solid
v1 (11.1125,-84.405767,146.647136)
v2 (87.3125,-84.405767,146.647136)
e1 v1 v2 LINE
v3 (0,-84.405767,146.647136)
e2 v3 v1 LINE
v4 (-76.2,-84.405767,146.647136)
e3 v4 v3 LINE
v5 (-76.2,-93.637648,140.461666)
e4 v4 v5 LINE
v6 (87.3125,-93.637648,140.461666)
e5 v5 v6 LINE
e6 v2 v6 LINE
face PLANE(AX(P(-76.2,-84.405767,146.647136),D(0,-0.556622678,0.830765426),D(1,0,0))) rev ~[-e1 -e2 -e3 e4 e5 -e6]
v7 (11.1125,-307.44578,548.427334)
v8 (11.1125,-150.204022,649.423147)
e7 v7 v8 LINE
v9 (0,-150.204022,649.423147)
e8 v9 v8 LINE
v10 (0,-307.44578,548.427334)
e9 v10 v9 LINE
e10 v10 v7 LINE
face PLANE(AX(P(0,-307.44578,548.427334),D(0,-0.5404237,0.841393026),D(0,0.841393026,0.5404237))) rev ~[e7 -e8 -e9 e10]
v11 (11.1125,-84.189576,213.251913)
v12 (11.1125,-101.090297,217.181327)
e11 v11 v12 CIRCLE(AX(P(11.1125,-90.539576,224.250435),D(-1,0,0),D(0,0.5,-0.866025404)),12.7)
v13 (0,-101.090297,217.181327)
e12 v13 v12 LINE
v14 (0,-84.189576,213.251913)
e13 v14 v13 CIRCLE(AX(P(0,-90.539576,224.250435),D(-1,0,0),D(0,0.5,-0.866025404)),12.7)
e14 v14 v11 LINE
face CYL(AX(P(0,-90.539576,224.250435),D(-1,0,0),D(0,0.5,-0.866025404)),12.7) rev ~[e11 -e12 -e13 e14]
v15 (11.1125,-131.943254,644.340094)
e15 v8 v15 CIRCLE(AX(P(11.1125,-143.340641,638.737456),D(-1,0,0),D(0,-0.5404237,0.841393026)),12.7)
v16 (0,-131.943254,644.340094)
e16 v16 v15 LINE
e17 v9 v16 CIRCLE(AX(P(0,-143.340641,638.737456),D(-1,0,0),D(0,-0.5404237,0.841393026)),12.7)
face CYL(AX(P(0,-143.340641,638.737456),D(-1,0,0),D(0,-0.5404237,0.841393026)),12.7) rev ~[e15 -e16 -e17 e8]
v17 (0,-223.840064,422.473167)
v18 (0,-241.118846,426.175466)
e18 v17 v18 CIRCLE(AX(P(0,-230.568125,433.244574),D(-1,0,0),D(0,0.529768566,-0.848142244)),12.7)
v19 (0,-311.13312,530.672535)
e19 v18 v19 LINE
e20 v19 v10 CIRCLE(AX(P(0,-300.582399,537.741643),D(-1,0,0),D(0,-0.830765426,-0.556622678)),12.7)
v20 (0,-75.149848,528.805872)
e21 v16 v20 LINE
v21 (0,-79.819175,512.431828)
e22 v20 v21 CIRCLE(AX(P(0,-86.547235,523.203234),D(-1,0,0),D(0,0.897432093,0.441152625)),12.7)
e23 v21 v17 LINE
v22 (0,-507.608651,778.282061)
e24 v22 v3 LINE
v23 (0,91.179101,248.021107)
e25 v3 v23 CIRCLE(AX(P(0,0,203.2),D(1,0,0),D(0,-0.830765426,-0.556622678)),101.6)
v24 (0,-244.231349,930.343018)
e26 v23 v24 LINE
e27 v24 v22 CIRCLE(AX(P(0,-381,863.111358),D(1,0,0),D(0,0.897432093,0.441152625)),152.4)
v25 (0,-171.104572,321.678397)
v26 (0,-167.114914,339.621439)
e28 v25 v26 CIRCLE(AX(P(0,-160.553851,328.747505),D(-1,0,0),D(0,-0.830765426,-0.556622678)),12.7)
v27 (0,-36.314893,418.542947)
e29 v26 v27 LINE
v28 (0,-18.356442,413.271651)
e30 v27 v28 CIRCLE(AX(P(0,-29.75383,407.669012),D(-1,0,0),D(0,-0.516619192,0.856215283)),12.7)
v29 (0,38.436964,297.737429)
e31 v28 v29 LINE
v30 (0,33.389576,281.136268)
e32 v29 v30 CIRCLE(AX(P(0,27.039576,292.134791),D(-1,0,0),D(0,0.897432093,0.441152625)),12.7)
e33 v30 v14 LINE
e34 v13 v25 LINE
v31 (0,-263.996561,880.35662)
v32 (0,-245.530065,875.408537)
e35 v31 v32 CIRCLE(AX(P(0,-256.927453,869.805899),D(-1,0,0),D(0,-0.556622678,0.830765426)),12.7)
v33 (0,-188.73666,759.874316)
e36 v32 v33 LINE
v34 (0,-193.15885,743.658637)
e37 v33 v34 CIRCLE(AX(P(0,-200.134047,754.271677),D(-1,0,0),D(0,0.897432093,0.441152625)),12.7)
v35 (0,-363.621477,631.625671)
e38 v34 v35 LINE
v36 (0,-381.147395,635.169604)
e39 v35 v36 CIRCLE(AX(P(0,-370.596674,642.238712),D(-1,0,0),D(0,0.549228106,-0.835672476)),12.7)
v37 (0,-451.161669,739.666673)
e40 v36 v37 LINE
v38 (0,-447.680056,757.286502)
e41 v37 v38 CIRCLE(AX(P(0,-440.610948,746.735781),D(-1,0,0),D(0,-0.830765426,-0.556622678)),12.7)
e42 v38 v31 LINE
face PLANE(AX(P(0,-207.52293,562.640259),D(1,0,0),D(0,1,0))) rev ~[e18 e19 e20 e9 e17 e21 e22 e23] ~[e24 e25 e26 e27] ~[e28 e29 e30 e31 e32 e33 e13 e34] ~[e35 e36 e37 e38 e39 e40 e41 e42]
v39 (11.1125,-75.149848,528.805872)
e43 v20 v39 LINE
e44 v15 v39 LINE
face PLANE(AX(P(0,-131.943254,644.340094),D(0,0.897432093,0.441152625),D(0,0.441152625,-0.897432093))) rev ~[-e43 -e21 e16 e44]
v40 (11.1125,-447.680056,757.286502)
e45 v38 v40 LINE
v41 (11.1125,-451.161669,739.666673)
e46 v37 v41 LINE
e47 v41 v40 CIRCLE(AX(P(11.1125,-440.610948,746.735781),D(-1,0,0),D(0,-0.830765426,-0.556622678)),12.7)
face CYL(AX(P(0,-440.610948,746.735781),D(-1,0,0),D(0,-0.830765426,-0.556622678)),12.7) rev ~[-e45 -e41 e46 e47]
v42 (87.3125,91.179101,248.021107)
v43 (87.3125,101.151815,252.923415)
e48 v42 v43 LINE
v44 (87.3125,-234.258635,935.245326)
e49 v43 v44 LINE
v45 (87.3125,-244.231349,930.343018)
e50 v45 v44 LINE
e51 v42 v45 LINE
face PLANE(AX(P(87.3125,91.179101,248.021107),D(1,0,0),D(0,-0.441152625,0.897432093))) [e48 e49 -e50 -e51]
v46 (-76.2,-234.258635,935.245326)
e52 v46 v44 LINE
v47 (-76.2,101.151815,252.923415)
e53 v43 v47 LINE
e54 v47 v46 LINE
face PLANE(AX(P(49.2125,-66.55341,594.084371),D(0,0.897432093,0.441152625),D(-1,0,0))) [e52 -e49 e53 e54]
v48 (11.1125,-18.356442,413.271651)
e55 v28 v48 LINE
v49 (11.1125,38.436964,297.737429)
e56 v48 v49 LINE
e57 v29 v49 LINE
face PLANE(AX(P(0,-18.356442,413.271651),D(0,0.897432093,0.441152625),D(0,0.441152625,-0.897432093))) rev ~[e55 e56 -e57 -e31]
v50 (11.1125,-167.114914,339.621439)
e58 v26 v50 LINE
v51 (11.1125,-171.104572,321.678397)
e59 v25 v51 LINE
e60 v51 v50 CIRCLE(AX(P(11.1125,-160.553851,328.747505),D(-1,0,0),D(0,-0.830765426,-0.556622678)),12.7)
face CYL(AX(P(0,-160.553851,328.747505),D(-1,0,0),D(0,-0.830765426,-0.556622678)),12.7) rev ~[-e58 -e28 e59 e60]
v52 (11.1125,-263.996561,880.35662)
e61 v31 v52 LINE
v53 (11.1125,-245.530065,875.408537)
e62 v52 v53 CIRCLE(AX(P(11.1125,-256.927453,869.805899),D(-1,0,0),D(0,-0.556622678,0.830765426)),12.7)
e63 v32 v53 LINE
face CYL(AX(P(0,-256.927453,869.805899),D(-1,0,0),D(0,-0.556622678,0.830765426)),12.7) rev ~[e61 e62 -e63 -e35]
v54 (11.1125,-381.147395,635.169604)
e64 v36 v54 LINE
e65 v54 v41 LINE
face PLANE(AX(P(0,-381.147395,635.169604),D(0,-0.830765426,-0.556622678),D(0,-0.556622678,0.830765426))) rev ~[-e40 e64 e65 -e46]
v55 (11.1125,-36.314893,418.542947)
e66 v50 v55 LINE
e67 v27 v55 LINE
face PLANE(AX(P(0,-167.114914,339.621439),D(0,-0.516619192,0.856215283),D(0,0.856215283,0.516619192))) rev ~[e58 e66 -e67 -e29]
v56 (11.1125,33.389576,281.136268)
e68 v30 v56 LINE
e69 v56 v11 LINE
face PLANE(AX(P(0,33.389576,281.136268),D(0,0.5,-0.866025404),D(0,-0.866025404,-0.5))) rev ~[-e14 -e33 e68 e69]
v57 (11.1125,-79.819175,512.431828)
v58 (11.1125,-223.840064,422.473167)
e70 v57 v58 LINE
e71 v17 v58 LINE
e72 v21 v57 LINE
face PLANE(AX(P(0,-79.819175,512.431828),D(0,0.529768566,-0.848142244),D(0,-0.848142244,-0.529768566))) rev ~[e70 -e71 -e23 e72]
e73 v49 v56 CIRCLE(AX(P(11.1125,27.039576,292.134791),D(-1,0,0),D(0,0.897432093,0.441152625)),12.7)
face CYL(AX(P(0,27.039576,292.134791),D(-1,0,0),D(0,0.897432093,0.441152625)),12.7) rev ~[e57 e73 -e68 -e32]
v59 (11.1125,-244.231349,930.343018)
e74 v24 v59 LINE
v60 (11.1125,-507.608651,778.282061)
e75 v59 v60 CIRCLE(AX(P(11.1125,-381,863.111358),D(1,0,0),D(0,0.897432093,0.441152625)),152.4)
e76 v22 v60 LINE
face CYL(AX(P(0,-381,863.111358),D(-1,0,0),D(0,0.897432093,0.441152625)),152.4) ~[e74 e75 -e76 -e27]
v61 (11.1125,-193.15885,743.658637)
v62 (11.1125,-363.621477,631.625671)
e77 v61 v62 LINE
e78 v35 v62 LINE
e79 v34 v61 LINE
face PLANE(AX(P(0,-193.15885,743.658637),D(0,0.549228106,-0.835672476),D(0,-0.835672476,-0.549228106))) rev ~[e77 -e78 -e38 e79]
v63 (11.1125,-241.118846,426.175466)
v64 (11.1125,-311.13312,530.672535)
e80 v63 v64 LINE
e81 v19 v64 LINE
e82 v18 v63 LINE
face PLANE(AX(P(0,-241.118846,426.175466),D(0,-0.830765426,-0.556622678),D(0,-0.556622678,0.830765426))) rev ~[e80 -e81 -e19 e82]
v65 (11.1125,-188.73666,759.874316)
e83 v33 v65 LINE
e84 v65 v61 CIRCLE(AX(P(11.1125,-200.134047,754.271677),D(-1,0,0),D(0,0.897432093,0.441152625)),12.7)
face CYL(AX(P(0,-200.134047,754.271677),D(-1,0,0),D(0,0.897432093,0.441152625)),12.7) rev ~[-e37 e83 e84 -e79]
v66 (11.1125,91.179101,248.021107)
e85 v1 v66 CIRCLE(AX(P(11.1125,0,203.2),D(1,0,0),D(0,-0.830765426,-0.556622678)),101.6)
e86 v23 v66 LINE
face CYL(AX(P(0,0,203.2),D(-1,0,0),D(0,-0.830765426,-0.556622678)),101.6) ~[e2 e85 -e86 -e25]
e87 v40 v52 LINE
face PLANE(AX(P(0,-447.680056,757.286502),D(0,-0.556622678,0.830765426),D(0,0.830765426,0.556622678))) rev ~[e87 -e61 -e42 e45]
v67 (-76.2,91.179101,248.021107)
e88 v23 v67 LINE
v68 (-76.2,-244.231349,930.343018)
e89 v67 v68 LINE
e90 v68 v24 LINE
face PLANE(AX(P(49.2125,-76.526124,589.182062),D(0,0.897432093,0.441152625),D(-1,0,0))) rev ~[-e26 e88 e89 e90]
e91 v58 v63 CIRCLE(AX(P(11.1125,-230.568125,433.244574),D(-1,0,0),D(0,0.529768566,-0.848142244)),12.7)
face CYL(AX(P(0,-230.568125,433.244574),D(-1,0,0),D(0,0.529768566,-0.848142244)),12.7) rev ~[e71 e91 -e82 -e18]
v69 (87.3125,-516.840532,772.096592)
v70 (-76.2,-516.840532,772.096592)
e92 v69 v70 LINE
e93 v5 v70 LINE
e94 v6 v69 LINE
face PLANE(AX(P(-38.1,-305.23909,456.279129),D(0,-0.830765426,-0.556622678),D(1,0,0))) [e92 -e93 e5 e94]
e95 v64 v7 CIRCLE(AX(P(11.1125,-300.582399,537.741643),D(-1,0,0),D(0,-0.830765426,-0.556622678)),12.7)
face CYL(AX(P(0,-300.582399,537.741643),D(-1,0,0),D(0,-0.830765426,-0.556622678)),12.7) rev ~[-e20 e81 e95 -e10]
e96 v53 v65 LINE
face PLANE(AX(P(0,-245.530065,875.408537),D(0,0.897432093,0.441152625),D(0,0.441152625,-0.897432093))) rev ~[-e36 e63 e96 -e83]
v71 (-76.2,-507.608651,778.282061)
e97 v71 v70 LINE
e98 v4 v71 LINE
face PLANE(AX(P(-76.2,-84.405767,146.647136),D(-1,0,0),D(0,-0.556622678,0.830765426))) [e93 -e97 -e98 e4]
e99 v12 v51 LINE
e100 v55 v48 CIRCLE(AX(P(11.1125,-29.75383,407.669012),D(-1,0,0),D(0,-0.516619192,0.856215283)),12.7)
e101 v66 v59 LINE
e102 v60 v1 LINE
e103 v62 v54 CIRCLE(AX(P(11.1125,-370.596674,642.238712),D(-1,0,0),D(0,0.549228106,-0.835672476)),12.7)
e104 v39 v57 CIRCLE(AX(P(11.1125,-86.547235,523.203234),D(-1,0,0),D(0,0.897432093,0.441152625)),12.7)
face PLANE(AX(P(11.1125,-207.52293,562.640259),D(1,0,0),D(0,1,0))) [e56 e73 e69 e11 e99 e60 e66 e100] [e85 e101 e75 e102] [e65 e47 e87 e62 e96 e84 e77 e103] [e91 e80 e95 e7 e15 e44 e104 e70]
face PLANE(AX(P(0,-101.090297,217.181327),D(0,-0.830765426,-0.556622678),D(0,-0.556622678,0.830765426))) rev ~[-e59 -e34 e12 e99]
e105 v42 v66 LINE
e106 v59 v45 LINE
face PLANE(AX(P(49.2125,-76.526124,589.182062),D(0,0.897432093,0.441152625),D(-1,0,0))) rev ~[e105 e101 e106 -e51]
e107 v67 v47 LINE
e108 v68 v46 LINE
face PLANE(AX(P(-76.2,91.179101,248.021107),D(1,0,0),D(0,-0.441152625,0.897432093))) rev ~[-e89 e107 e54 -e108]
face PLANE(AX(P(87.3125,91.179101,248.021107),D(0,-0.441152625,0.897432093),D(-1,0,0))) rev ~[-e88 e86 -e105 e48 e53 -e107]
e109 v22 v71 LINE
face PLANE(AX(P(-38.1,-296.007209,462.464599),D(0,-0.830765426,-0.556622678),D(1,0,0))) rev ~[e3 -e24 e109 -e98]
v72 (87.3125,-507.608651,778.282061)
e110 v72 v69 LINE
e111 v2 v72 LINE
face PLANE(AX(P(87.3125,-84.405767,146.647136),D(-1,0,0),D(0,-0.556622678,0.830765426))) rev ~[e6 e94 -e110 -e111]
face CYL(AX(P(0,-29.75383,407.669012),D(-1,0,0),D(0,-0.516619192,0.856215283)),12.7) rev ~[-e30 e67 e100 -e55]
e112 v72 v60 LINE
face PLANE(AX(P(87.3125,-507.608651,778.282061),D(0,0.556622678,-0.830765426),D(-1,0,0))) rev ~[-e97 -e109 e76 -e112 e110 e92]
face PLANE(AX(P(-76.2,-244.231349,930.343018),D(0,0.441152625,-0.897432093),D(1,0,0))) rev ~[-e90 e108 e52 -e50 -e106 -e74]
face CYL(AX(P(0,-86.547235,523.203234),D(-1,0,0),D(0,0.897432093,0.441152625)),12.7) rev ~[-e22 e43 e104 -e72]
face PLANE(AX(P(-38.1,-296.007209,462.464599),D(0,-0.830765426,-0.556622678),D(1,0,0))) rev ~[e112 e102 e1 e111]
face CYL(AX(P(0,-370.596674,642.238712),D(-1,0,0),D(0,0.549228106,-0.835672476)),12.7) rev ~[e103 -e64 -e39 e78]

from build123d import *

# Parameters (mm, degrees)
F2_DEPTH = 11.1125
F3_W     = 76.2
F3_H     = 760.3047809925
F3_W_2   = 11.1125
F4_DEPTH = 11.1125
F5_W     = 76.2
F5_H     = 760.3047809925
F5_W_2   = 11.1125
F6_DEPTH = 11.1125


# Not quite as in the source:
# - a length typed as a fraction of an inch, garbled in the dataset ("3 / 203.2 mm" for 3/8 in), is restored


with BuildPart() as f2:
    # F1 (on face) → F2 (new body)
    with BuildSketch(Plane.YZ):
        with BuildLine():
            Line((91.1791006611, 248.0211066645), (-244.2313490084, 930.3430176805))
            ThreePointArc((-244.2313490084, 930.3430176805), (-457.2, 995.0936292205), (-507.6086509916, 778.282061482))
            Line((-507.6086509916, 778.2820614821), (-84.4057673278, 146.6471358655))
            ThreePointArc((-84.4057673278, 146.6471358655), (50.8, 115.2118189755), (91.1791006611, 248.0211066645))
        make_face()
        with BuildLine():
            ThreePointArc((-171.1045716164, 321.6783965077), (-172.951087632, 331.5040451939), (-167.114914439, 339.6214386156))
            Line((-167.114914439, 339.6214386156), (-36.3148932715, 418.5429465727))
            ThreePointArc((-36.3148932715, 418.5429465727), (-26.1769388687, 419.8548999412), (-18.3564419502, 413.2716508147))
            Line((-18.3564419502, 413.2716508147), (38.4369639182, 297.7374291963))
            ThreePointArc((38.4369639182, 297.7374291963), (39.1903819803, 288.4404814306), (33.3895763356, 281.1362682351))
            Line((33.3895763356, 281.1362682351), (-84.1895763356, 213.2519127894))
            ThreePointArc((-84.1895763356, 213.2519127894), (-93.4156133399, 211.8803743364), (-101.0902972515, 217.1813274006))
            Line((-101.0902972515, 217.1813274006), (-171.1045716164, 321.6783965077))
        make_face(mode=Mode.SUBTRACT)
        with BuildLine():
            ThreePointArc((-311.133120346, 530.6725347217), (-313.0170671845, 540.3240907704), (-307.4457804185, 548.4273341718))
            Line((-307.4457804185, 548.4273341718), (-150.2040222582, 649.4231471517))
            ThreePointArc((-150.2040222582, 649.4231471517), (-139.9349605516, 650.9722969045), (-131.9432536871, 644.3400940516))
            Line((-131.9432536871, 644.3400940516), (-75.1498478186, 528.8058724331))
            ThreePointArc((-75.1498478186, 528.8058724331), (-74.3341151725, 519.7204630371), (-79.8191746138, 512.4318275976))
            Line((-79.8191746138, 512.4318275976), (-223.8400642778, 422.4731671291))
            ThreePointArc((-223.8400642778, 422.4731671291), (-233.2289400031, 420.8264391554), (-241.1188459812, 426.1754656147))
            Line((-241.1188459812, 426.1754656147), (-311.133120346, 530.6725347217))
        make_face(mode=Mode.SUBTRACT)
        with BuildLine():
            ThreePointArc((-451.1616690757, 739.6666729358), (-453.0700486814, 749.1976530431), (-447.6800561765, 757.2865018686))
            Line((-447.6800561765, 757.2865018686), (-263.9965610234, 880.3566198713))
            ThreePointArc((-263.9965610234, 880.3566198713), (-253.6404511337, 882.0731569492), (-245.5300654239, 875.4085372884))
            Line((-245.5300654239, 875.4085372884), (-188.7366595555, 759.87431567))
            ThreePointArc((-188.7366595555, 759.87431567), (-187.8814953559, 750.930274215), (-193.1588501861, 743.6586368923))
            Line((-193.1588501861, 743.6586368923), (-363.6214768428, 631.6256714009))
            ThreePointArc((-363.6214768428, 631.6256714009), (-373.1138065223, 629.7906580687), (-381.1473947108, 635.1696038288))
            Line((-381.1473947108, 635.1696038288), (-451.1616690757, 739.6666729358))
        make_face(mode=Mode.SUBTRACT)
    extrude(amount=F2_DEPTH)

    # F3 (on face) → F4 (join)
    with BuildSketch(Plane(origin=(0, 171.626899801, 84.3670043542), x_dir=(-1, 0, 0), z_dir=(0, 0.8974320931, 0.4411526247))):
        with Locations((-49.2125, 562.5105918184)):
            Rectangle(F3_W, F3_H)
        with Locations((38.1, 562.5105918184)):
            Rectangle(F3_W, F3_H)
        with Locations((-5.55625, 562.5105918184)):
            Rectangle(F3_W_2, F3_H)
    extrude(amount=F4_DEPTH)

    # F5 (on face) → F6 (join)
    with BuildSketch(Plane(origin=(0, 9.558561252, 6.404349287), x_dir=(1, 0, 0), z_dir=(0, -0.8307654265, -0.5566226785))):
        with Locations((-38.1, 548.9639251518)):
            Rectangle(F5_W, F5_H)
        with Locations((49.2125, 548.9639251518)):
            Rectangle(F5_W, F5_H)
        with Locations((5.55625, 548.9639251518)):
            Rectangle(F5_W_2, F5_H)
    extrude(amount=F6_DEPTH)


solid = f2.part
